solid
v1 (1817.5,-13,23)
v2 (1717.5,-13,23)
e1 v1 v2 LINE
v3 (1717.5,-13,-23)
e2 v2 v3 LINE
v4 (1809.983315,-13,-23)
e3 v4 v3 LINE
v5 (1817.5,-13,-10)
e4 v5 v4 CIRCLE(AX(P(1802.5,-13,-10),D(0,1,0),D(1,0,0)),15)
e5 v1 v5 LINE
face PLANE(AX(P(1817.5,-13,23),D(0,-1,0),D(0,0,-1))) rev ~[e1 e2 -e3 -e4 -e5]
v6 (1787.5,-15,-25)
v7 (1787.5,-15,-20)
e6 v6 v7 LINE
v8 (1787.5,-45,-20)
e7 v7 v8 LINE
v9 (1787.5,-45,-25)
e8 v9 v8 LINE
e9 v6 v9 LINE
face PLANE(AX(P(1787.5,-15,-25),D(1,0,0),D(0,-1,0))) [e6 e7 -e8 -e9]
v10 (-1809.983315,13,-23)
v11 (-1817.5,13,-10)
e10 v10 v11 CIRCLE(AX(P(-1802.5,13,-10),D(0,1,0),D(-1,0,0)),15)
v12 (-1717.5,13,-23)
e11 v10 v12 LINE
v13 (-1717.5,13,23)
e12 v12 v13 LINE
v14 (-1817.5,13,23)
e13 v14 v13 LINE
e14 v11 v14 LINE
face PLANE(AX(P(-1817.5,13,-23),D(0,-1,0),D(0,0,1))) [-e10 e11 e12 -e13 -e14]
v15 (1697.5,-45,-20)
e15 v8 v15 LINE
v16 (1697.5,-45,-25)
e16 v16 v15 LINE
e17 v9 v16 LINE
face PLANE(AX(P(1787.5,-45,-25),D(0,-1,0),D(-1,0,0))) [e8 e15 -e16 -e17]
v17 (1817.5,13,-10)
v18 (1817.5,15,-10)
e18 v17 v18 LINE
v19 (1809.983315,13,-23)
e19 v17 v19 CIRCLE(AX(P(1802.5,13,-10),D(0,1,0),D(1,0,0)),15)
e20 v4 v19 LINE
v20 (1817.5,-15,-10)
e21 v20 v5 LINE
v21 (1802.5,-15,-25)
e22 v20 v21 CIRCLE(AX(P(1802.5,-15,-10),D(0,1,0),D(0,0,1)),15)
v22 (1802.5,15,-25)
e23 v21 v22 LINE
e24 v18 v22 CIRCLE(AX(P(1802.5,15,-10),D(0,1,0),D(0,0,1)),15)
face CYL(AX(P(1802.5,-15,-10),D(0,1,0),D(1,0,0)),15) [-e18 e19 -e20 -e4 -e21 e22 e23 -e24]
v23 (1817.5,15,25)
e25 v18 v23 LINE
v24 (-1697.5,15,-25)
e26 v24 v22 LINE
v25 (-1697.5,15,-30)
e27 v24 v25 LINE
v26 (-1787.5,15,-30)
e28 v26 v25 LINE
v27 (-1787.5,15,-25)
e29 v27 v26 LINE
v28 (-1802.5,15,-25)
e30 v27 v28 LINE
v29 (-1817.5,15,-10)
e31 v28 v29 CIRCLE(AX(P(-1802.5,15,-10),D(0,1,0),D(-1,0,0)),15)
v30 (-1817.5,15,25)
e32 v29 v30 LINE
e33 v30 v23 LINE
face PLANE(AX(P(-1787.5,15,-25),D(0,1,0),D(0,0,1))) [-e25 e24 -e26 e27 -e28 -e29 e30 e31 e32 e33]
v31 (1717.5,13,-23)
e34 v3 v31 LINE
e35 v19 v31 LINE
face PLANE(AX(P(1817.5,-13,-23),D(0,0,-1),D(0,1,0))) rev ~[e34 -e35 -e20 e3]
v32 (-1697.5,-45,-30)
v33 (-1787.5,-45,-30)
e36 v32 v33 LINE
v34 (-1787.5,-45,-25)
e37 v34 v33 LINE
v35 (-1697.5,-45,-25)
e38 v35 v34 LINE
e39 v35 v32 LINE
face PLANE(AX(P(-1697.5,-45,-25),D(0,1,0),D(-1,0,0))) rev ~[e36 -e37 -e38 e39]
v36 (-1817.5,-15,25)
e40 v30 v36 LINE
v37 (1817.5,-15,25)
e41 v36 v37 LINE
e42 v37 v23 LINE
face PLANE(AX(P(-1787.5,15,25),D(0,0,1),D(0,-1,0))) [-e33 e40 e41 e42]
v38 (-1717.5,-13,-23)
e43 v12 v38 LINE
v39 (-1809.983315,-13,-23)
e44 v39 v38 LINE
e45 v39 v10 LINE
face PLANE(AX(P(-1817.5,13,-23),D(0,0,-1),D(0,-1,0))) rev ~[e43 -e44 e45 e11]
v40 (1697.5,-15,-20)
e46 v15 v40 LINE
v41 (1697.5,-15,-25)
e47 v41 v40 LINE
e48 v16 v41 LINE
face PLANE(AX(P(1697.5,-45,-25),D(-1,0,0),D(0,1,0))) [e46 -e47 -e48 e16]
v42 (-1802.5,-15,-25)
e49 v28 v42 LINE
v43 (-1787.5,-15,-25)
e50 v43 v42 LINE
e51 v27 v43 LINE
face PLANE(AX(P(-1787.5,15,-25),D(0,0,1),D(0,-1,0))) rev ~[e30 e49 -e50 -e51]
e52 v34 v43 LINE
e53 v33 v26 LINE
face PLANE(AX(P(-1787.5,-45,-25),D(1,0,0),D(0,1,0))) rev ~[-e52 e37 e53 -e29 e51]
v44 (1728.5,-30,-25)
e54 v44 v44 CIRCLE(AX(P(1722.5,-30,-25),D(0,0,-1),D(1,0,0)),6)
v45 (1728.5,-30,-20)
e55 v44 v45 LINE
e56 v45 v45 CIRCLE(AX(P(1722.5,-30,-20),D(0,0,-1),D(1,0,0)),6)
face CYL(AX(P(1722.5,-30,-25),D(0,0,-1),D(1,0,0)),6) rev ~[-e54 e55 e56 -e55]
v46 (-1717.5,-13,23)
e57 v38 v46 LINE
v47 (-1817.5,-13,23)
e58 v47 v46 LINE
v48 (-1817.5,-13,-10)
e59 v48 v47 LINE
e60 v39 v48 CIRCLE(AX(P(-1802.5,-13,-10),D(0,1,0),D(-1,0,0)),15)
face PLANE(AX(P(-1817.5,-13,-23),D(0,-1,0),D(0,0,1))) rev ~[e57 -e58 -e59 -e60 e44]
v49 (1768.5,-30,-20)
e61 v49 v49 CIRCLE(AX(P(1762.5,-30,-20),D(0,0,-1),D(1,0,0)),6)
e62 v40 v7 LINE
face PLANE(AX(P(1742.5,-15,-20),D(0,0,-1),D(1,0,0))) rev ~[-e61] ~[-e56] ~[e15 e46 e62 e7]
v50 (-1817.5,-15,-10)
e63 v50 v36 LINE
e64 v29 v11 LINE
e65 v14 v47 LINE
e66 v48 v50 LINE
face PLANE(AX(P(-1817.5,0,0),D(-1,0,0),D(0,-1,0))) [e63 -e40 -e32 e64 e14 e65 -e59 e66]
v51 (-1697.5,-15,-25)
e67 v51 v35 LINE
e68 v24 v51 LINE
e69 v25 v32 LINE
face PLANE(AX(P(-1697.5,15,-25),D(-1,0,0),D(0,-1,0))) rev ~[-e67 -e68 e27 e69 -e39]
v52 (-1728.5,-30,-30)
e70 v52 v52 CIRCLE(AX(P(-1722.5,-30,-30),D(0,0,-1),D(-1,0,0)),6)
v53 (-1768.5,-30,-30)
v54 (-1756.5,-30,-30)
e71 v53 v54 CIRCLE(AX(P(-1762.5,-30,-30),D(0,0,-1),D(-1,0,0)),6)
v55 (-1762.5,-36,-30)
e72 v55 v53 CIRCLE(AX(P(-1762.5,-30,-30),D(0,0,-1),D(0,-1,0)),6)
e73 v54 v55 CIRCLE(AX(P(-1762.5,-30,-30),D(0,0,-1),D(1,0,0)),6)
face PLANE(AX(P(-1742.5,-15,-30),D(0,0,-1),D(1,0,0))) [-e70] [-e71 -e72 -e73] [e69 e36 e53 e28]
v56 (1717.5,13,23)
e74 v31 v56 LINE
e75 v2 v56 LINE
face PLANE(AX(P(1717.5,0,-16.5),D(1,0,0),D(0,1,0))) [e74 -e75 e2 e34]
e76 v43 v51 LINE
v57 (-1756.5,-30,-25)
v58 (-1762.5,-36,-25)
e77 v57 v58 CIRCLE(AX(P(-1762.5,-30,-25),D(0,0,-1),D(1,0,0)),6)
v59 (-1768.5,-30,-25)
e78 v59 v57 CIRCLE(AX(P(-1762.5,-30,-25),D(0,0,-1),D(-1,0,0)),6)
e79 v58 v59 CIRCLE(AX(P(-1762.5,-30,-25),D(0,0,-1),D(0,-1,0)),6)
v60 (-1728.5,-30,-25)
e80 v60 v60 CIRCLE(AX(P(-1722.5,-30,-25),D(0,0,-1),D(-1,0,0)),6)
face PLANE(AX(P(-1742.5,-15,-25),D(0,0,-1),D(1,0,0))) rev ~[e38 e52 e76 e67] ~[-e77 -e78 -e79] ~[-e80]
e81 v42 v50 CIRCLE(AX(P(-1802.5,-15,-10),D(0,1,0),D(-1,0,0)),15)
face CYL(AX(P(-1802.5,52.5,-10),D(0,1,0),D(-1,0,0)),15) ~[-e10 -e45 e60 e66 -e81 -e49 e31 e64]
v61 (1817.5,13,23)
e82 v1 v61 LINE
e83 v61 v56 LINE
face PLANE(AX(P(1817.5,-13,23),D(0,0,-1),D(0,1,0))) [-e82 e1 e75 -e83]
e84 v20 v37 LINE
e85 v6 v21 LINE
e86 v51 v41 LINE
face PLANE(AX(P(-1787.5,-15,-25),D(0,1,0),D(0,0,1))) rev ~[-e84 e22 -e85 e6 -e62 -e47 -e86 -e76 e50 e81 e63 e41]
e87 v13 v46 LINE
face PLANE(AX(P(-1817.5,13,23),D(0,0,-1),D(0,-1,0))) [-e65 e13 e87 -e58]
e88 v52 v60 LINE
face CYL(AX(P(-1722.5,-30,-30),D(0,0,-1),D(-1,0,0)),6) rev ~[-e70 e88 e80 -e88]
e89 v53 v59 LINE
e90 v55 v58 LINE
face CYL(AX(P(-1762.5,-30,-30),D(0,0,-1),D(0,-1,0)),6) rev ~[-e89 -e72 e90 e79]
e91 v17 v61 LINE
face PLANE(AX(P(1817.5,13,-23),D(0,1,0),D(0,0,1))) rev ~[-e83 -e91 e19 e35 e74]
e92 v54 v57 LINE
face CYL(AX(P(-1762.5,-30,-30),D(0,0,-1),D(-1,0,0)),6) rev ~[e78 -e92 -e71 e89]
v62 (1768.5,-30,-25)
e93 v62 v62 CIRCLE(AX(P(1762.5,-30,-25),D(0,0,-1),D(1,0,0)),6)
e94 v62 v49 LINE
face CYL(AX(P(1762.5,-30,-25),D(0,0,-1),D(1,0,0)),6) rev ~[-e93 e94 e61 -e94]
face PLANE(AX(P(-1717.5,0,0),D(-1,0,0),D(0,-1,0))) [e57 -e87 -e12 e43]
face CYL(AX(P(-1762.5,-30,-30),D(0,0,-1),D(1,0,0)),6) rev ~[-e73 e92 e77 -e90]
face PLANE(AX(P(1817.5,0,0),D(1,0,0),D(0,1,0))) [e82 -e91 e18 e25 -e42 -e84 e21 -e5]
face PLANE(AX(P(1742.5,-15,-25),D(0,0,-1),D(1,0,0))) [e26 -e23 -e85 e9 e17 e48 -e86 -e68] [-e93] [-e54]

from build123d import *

# Parameters (mm, degrees)
F0_W          = 3575
F0_H          = 50
F1_DEPTH      = 15
F1_DEPTH_BACK = 15
F3_DEPTH      = 5
F5_DEPTH      = 5
F6_R          = 6
F7_DEPTH      = 5
F8_R          = 6
F9_DEPTH      = 5
F12_DEPTH     = 5
F13_W         = 30
F13_H         = 50
F14_DEPTH     = 30
F15_R         = 15
F16_W         = 26
F16_H         = 13
F16_H_2       = 33
F17_DEPTH     = 100
F18_W         = 30
F18_H         = 50
F19_DEPTH     = 30
F20_W         = 26
F20_H         = 46
F21_DEPTH     = 100
F22_T1_DEPTH  = 105
F23_DEPTH     = 5
F24_DEPTH     = 5


# Not quite as in the source:
# - a fillet or chamfer that OpenCascade refuses, or shapes differently, is made with other operations: its cross-section is extruded or revolved along the edge and cut away or added


with BuildPart() as f1:
    # F0 (on Front) → F1 (new body, two sides)
    with BuildSketch(Plane.XZ) as f1_sk:
        Rectangle(F0_W, F0_H)
    extrude(amount=F1_DEPTH)
    extrude(f1_sk.sketch, amount=-F1_DEPTH_BACK)

    # F2 (on face) → F3 (join)
    with BuildSketch(Plane(origin=(0, 0, -25), x_dir=(1, 0, 0), z_dir=(0, 0, -1))):
        Polygon((-1787.5, 45), (-1787.5, 15), (-1787.5, -15), (-1697.5, -15), (-1697.5, 45), align=None)
    extrude(amount=F3_DEPTH)

    # F4 (on face) → F5 (join)
    with BuildSketch(Plane(origin=(0, 0, -25), x_dir=(1, 0, 0), z_dir=(0, 0, -1))):
        Polygon((1787.5, -15), (1787.5, 15), (1787.5, 45), (1697.5, 45), (1697.5, -15), align=None)
    extrude(amount=F5_DEPTH)

    # F6 (on face) → F7 (cut, through all)
    with BuildSketch(Plane(origin=(0, 0, -30), x_dir=(1, 0, 0), z_dir=(0, 0, -1))):
        with Locations((-935, 30)):
            Circle(F6_R)
        with Locations((-975, 30)):
            Circle(F6_R)
    extrude(amount=-F7_DEPTH, mode=Mode.SUBTRACT)

    # F8 (on face) → F9 (cut, through all)
    with BuildSketch(Plane(origin=(0, 0, -30), x_dir=(1, 0, 0), z_dir=(0, 0, -1))):
        with Locations((1762.5, 30)):
            Circle(F8_R)
        with Locations((1722.5, 30)):
            Circle(F8_R)
    extrude(amount=-F9_DEPTH, mode=Mode.SUBTRACT)

    # F11 (on face) → F12 (cut, through all)
    with BuildSketch(Plane(origin=(0, 0, -30), x_dir=(1, 0, 0), z_dir=(0, 0, -1))):
        with BuildLine():
            ThreePointArc((-1762.5, 36), (-1766.7426406871, 34.2426406871), (-1768.5, 30))
            Line((-1768.5, 30), (-1762.5, 30))
            Line((-1762.5, 30), (-1762.5, 36))
        make_face()
        with BuildLine():
            ThreePointArc((-1716.5, 30), (-1722.5, 36), (-1728.5, 30))
            ThreePointArc((-1728.5, 30), (-1722.5, 24), (-1716.5, 30))
        make_face()
        with BuildLine():
            Line((-1762.5, 30), (-1768.5, 30))
            ThreePointArc((-1768.5, 30), (-1762.5, 24), (-1756.5, 30))
            Line((-1756.5, 30), (-1762.5, 30))
        make_face()
        with BuildLine():
            Line((-1762.5, 36), (-1762.5, 30))
            Line((-1762.5, 30), (-1756.5, 30))
            ThreePointArc((-1756.5, 30), (-1758.2573593129, 34.2426406871), (-1762.5, 36))
        make_face()
    extrude(amount=-F12_DEPTH, mode=Mode.SUBTRACT)

    # F13 (on face) → F14 (join)
    with BuildSketch(Plane.YZ.offset(1787.5)):
        Rectangle(F13_W, F13_H)
    extrude(amount=F14_DEPTH)

    # F15
    f15_edges = [f1.edges().sort_by_distance(p)[0] for p in [
        (1817.5, 0, -25),
    ]]
    fillet(f15_edges, radius=F15_R)

    # F16 (on face) → F17 (cut)
    with BuildSketch(Plane.YZ.offset(1817.5)):
        with Locations((0, -16.5)):
            Rectangle(F16_W, F16_H)
        with Locations((0, 6.5)):
            Rectangle(F16_W, F16_H_2)
    extrude(amount=-F17_DEPTH, mode=Mode.SUBTRACT)

    # F18 (on face) → F19 (join)
    with BuildSketch(Plane(origin=(-1787.5, 0, 0), x_dir=(0, -1, 0), z_dir=(-1, 0, 0))):
        Rectangle(F18_W, F18_H)
    extrude(amount=F19_DEPTH)

    # F20 (on face) → F21 (cut)
    with BuildSketch(Plane(origin=(-1817.5, 0, 0), x_dir=(0, -1, 0), z_dir=(-1, 0, 0))):
        Rectangle(F20_W, F20_H)
    extrude(amount=-F21_DEPTH, mode=Mode.SUBTRACT)

    # F22: fillet of radius 15 on 1 edges, made by hand

    # F22_s2 → F22_t1 (cut)
    with BuildSketch(Plane.XZ.offset(-52.5)):
        with BuildLine():
            ThreePointArc((-1817.5, -10), (-1813.1066017178, -20.6066017178), (-1802.5, -25))
            Line((-1802.5, -25), (-1817.5, -25))
            Line((-1817.5, -25), (-1817.5, -10))
        make_face()
    extrude(amount=F22_T1_DEPTH, mode=Mode.SUBTRACT)

    # F23 (add): a face of the model
    f23_faces = [f1.faces().sort_by_distance(p)[0] for p in [
        (1742.5, -30, -25),
    ]]
    extrude(f23_faces, amount=F23_DEPTH)

    # F24 (cut): a face of the model
    f24_faces = [f1.faces().sort_by_distance(p)[0] for p in [
        (1742.5, -14.3442118808, -30),
    ]]
    extrude(f24_faces, amount=-F24_DEPTH, mode=Mode.SUBTRACT)


solid = f1.part
